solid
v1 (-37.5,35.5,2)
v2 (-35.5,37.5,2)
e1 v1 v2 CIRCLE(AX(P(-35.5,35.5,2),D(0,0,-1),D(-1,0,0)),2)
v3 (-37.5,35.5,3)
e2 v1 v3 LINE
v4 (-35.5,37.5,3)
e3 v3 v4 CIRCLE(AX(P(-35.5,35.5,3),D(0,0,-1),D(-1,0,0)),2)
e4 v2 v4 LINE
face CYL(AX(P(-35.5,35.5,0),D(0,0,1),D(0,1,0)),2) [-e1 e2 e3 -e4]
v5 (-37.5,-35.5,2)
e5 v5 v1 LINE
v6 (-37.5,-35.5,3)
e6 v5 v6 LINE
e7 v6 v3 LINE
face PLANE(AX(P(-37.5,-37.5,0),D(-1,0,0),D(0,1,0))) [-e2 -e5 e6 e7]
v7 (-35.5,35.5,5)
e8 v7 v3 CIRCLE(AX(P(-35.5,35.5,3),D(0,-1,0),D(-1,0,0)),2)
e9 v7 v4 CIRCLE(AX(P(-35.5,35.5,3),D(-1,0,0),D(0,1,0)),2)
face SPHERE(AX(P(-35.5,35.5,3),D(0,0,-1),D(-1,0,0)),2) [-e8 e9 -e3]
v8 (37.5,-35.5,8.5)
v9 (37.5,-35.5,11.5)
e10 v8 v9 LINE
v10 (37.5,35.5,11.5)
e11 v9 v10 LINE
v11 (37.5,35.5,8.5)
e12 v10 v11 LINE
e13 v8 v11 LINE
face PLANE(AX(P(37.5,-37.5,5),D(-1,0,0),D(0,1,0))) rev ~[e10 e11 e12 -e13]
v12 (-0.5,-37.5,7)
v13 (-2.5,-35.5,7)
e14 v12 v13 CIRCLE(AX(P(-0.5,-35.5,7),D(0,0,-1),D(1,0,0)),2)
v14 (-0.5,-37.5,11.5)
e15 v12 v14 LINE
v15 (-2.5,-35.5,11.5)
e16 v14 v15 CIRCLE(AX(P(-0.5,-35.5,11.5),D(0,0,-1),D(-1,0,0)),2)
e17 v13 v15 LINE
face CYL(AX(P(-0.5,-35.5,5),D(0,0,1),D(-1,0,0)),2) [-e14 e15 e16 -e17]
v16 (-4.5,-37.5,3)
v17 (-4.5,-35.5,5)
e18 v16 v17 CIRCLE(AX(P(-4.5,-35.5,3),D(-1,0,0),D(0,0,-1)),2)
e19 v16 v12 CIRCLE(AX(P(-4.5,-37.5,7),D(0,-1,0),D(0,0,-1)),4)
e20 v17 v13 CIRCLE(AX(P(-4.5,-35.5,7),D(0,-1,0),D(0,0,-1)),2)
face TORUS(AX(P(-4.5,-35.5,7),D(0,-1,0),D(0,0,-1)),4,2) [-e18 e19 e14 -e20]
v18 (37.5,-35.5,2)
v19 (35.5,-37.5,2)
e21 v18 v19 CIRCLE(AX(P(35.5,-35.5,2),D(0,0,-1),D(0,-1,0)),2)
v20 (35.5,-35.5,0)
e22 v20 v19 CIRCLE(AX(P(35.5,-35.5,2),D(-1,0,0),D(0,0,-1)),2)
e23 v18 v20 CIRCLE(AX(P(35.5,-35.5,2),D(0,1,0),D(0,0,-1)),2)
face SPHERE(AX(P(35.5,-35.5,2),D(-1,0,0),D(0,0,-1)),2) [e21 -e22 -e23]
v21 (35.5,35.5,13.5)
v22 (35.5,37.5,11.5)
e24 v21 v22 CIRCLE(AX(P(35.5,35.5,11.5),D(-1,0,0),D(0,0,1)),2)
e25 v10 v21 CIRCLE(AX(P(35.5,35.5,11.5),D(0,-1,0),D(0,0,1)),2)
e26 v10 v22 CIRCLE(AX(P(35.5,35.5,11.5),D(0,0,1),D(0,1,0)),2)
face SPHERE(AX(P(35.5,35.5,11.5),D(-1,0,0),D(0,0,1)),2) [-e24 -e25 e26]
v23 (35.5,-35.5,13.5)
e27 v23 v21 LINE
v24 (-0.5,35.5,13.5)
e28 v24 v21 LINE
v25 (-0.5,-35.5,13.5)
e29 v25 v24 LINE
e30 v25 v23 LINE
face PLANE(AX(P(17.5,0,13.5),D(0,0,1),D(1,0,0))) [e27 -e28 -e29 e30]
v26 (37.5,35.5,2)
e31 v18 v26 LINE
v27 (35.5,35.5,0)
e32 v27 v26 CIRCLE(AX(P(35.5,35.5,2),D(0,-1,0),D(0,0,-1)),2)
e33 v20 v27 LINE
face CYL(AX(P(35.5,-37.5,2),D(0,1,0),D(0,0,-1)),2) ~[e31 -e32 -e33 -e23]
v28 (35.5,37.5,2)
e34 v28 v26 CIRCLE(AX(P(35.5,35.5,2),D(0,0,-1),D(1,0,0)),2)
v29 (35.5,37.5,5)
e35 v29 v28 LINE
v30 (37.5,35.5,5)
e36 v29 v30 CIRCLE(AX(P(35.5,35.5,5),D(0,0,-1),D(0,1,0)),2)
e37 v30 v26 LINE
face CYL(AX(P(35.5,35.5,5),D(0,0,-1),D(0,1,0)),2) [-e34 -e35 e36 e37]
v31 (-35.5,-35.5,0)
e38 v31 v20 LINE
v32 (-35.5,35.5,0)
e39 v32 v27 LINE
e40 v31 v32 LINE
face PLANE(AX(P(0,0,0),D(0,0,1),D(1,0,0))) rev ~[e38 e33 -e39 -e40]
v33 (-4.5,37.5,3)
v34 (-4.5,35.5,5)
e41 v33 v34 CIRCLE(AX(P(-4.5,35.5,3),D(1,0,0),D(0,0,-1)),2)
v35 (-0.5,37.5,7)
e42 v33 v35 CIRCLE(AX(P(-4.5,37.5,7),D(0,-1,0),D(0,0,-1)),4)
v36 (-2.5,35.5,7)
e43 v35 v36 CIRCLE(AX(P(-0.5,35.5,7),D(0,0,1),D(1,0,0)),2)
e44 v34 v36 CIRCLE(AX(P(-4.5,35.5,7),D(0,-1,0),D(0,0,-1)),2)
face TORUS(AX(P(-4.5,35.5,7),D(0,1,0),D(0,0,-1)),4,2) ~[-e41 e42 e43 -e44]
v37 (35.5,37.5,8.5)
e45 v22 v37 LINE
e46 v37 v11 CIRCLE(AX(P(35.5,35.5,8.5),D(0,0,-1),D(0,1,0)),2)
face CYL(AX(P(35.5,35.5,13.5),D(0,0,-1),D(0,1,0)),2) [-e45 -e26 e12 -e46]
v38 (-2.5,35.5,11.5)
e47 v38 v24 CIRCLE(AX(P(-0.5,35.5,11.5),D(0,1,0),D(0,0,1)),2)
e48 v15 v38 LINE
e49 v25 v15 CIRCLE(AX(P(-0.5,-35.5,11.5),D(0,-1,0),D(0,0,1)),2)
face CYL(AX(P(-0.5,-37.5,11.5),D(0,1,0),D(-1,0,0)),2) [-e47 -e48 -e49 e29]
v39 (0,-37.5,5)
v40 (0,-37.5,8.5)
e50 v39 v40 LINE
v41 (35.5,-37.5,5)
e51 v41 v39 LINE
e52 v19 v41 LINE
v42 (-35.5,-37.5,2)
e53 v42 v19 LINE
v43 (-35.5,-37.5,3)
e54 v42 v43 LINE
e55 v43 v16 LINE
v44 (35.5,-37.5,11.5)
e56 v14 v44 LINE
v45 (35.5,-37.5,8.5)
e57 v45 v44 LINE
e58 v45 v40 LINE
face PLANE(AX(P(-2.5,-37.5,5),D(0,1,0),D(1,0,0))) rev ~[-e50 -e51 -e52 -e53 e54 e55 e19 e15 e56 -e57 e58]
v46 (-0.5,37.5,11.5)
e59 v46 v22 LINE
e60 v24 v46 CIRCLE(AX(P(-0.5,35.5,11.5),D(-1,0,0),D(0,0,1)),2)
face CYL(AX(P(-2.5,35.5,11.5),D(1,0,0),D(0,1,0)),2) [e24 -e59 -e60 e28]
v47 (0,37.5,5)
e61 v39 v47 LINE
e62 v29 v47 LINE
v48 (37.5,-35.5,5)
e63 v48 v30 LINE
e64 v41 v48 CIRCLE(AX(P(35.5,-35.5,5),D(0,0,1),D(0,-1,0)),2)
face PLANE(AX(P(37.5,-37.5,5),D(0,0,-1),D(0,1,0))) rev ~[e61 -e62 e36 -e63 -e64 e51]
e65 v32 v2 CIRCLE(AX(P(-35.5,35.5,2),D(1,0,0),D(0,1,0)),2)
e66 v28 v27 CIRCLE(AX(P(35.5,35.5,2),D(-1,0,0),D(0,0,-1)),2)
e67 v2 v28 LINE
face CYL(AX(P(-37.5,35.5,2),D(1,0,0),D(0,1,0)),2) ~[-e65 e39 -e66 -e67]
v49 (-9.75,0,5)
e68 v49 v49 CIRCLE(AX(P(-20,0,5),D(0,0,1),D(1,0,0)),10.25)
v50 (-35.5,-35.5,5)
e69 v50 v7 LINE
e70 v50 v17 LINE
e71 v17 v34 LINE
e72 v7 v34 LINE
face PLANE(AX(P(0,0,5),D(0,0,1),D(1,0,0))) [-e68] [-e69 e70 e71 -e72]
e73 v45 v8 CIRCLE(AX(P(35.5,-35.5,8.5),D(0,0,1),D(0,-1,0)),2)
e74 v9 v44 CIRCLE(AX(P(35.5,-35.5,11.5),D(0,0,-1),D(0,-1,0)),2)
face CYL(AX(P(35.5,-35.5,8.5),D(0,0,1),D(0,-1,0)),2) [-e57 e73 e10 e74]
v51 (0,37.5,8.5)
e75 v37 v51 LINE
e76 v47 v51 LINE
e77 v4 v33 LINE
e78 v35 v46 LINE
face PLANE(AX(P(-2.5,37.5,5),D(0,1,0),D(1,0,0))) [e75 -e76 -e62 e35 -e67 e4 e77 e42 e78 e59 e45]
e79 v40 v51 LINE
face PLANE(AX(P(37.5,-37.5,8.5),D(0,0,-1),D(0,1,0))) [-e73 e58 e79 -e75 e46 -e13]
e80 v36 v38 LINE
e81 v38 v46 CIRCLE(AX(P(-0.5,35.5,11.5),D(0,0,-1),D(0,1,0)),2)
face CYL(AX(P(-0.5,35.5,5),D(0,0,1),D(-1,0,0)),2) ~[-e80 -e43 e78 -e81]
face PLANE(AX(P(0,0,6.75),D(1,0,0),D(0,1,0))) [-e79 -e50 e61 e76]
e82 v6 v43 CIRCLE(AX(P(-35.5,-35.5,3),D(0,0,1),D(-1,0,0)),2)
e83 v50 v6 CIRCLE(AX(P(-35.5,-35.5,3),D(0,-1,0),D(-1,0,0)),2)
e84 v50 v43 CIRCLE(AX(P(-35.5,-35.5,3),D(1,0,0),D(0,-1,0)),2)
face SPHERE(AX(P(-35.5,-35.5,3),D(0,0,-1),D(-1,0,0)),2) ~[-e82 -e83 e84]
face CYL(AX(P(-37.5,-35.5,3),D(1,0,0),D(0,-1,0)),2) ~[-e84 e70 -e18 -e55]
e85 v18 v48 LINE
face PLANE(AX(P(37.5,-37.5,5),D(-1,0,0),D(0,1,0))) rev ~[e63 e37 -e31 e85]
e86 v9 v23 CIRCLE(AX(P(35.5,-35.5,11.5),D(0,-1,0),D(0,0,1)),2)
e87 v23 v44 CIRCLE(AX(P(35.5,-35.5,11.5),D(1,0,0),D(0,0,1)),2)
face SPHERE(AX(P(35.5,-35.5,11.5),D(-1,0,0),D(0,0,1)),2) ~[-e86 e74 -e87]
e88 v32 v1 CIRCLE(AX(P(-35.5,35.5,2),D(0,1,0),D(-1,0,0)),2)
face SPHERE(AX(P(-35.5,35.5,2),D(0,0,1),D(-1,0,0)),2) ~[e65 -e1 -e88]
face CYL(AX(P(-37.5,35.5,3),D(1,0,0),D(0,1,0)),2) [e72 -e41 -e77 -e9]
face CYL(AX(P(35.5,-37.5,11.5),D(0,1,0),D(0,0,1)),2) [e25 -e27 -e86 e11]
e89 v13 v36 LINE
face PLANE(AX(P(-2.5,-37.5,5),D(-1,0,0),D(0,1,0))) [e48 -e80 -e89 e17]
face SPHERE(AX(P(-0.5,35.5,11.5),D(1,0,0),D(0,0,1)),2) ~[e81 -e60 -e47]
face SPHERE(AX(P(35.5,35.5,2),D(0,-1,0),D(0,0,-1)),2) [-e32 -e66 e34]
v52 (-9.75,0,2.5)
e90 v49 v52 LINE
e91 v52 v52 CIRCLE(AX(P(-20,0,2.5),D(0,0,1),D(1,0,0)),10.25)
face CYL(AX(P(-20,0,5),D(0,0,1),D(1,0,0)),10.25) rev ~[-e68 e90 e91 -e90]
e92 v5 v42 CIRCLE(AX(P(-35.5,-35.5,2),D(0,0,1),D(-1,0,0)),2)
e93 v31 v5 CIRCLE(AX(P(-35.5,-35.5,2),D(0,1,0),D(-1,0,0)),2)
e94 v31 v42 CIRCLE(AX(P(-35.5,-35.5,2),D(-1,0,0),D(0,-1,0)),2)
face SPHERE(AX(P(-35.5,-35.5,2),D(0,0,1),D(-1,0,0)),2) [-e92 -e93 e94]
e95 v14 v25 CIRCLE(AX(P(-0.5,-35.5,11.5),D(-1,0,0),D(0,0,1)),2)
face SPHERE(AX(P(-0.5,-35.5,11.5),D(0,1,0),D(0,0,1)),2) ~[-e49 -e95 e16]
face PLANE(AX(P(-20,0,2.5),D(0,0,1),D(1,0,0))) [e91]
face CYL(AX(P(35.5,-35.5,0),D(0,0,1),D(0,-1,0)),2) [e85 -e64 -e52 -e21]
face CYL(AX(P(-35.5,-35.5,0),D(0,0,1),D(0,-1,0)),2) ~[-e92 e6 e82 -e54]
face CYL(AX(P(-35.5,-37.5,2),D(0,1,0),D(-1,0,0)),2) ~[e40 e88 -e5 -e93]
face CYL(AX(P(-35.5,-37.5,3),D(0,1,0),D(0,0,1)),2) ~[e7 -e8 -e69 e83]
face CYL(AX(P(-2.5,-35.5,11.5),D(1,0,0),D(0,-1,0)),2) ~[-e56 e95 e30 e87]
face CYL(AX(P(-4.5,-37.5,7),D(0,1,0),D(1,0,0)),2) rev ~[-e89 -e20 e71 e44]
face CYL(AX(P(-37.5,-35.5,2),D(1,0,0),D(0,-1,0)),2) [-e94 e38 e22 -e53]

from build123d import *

# Parameters (mm, degrees)
F0_W     = 75
F0_H     = 75
F1_DEPTH = 5
F2_W     = 40
F2_H     = 75
F3_DEPTH = 8.5
F4_W     = 75
F4_H     = 3.5
F5_DEPTH = 37.5
F6_R     = 10.25
F7_DEPTH = 2.5
F8_R     = 2


with BuildPart() as f1:
    # F0 (on Top) → F1 (new body)
    with BuildSketch(Plane.XY):
        Rectangle(F0_W, F0_H)
    extrude(amount=F1_DEPTH)

    # F2 (on face) → F3 (join)
    with BuildSketch(Plane.XY.offset(5)):
        with Locations((17.5, 0)):
            Rectangle(F2_W, F2_H)
    extrude(amount=F3_DEPTH)

    # F4 (on face) → F5 (cut, through all)
    with BuildSketch(Plane.YZ.offset(37.5)):
        with Locations((0, 6.75)):
            Rectangle(F4_W, F4_H)
    extrude(amount=-F5_DEPTH, mode=Mode.SUBTRACT)

    # F6 (on face) → F7 (cut)
    with BuildSketch(Plane.XY.offset(5)):
        with Locations((-20, 0)):
            Circle(F6_R)
    extrude(amount=-F7_DEPTH, mode=Mode.SUBTRACT)

    # F8
    f8_edges = [f1.edges().sort_by_distance(p)[0] for p in [
        (17.5, 37.5, 13.5),
        (-2.5, 0, 13.5),
        (17.5, -37.5, 13.5),
        (37.5, 0, 13.5),
        (-2.5, 37.5, 9.25),
        (-2.5, -37.5, 9.25),
        (-2.5, 0, 5),
        (-37.5, 37.5, 2.5),
        (-37.5, -37.5, 2.5),
        (-37.5, 0, 0),
        (-37.5, 0, 5),
        (0, -37.5, 0),
        (37.5, 0, 0),
        (0, 37.5, 0),
        (37.5, -37.5, 11),
        (37.5, -37.5, 2.5),
        (37.5, 37.5, 11),
        (37.5, 37.5, 2.5),
        (-20, -37.5, 5),
        (-20, 37.5, 5),
    ]]
    fillet(f8_edges, radius=F8_R)


solid = f1.part
